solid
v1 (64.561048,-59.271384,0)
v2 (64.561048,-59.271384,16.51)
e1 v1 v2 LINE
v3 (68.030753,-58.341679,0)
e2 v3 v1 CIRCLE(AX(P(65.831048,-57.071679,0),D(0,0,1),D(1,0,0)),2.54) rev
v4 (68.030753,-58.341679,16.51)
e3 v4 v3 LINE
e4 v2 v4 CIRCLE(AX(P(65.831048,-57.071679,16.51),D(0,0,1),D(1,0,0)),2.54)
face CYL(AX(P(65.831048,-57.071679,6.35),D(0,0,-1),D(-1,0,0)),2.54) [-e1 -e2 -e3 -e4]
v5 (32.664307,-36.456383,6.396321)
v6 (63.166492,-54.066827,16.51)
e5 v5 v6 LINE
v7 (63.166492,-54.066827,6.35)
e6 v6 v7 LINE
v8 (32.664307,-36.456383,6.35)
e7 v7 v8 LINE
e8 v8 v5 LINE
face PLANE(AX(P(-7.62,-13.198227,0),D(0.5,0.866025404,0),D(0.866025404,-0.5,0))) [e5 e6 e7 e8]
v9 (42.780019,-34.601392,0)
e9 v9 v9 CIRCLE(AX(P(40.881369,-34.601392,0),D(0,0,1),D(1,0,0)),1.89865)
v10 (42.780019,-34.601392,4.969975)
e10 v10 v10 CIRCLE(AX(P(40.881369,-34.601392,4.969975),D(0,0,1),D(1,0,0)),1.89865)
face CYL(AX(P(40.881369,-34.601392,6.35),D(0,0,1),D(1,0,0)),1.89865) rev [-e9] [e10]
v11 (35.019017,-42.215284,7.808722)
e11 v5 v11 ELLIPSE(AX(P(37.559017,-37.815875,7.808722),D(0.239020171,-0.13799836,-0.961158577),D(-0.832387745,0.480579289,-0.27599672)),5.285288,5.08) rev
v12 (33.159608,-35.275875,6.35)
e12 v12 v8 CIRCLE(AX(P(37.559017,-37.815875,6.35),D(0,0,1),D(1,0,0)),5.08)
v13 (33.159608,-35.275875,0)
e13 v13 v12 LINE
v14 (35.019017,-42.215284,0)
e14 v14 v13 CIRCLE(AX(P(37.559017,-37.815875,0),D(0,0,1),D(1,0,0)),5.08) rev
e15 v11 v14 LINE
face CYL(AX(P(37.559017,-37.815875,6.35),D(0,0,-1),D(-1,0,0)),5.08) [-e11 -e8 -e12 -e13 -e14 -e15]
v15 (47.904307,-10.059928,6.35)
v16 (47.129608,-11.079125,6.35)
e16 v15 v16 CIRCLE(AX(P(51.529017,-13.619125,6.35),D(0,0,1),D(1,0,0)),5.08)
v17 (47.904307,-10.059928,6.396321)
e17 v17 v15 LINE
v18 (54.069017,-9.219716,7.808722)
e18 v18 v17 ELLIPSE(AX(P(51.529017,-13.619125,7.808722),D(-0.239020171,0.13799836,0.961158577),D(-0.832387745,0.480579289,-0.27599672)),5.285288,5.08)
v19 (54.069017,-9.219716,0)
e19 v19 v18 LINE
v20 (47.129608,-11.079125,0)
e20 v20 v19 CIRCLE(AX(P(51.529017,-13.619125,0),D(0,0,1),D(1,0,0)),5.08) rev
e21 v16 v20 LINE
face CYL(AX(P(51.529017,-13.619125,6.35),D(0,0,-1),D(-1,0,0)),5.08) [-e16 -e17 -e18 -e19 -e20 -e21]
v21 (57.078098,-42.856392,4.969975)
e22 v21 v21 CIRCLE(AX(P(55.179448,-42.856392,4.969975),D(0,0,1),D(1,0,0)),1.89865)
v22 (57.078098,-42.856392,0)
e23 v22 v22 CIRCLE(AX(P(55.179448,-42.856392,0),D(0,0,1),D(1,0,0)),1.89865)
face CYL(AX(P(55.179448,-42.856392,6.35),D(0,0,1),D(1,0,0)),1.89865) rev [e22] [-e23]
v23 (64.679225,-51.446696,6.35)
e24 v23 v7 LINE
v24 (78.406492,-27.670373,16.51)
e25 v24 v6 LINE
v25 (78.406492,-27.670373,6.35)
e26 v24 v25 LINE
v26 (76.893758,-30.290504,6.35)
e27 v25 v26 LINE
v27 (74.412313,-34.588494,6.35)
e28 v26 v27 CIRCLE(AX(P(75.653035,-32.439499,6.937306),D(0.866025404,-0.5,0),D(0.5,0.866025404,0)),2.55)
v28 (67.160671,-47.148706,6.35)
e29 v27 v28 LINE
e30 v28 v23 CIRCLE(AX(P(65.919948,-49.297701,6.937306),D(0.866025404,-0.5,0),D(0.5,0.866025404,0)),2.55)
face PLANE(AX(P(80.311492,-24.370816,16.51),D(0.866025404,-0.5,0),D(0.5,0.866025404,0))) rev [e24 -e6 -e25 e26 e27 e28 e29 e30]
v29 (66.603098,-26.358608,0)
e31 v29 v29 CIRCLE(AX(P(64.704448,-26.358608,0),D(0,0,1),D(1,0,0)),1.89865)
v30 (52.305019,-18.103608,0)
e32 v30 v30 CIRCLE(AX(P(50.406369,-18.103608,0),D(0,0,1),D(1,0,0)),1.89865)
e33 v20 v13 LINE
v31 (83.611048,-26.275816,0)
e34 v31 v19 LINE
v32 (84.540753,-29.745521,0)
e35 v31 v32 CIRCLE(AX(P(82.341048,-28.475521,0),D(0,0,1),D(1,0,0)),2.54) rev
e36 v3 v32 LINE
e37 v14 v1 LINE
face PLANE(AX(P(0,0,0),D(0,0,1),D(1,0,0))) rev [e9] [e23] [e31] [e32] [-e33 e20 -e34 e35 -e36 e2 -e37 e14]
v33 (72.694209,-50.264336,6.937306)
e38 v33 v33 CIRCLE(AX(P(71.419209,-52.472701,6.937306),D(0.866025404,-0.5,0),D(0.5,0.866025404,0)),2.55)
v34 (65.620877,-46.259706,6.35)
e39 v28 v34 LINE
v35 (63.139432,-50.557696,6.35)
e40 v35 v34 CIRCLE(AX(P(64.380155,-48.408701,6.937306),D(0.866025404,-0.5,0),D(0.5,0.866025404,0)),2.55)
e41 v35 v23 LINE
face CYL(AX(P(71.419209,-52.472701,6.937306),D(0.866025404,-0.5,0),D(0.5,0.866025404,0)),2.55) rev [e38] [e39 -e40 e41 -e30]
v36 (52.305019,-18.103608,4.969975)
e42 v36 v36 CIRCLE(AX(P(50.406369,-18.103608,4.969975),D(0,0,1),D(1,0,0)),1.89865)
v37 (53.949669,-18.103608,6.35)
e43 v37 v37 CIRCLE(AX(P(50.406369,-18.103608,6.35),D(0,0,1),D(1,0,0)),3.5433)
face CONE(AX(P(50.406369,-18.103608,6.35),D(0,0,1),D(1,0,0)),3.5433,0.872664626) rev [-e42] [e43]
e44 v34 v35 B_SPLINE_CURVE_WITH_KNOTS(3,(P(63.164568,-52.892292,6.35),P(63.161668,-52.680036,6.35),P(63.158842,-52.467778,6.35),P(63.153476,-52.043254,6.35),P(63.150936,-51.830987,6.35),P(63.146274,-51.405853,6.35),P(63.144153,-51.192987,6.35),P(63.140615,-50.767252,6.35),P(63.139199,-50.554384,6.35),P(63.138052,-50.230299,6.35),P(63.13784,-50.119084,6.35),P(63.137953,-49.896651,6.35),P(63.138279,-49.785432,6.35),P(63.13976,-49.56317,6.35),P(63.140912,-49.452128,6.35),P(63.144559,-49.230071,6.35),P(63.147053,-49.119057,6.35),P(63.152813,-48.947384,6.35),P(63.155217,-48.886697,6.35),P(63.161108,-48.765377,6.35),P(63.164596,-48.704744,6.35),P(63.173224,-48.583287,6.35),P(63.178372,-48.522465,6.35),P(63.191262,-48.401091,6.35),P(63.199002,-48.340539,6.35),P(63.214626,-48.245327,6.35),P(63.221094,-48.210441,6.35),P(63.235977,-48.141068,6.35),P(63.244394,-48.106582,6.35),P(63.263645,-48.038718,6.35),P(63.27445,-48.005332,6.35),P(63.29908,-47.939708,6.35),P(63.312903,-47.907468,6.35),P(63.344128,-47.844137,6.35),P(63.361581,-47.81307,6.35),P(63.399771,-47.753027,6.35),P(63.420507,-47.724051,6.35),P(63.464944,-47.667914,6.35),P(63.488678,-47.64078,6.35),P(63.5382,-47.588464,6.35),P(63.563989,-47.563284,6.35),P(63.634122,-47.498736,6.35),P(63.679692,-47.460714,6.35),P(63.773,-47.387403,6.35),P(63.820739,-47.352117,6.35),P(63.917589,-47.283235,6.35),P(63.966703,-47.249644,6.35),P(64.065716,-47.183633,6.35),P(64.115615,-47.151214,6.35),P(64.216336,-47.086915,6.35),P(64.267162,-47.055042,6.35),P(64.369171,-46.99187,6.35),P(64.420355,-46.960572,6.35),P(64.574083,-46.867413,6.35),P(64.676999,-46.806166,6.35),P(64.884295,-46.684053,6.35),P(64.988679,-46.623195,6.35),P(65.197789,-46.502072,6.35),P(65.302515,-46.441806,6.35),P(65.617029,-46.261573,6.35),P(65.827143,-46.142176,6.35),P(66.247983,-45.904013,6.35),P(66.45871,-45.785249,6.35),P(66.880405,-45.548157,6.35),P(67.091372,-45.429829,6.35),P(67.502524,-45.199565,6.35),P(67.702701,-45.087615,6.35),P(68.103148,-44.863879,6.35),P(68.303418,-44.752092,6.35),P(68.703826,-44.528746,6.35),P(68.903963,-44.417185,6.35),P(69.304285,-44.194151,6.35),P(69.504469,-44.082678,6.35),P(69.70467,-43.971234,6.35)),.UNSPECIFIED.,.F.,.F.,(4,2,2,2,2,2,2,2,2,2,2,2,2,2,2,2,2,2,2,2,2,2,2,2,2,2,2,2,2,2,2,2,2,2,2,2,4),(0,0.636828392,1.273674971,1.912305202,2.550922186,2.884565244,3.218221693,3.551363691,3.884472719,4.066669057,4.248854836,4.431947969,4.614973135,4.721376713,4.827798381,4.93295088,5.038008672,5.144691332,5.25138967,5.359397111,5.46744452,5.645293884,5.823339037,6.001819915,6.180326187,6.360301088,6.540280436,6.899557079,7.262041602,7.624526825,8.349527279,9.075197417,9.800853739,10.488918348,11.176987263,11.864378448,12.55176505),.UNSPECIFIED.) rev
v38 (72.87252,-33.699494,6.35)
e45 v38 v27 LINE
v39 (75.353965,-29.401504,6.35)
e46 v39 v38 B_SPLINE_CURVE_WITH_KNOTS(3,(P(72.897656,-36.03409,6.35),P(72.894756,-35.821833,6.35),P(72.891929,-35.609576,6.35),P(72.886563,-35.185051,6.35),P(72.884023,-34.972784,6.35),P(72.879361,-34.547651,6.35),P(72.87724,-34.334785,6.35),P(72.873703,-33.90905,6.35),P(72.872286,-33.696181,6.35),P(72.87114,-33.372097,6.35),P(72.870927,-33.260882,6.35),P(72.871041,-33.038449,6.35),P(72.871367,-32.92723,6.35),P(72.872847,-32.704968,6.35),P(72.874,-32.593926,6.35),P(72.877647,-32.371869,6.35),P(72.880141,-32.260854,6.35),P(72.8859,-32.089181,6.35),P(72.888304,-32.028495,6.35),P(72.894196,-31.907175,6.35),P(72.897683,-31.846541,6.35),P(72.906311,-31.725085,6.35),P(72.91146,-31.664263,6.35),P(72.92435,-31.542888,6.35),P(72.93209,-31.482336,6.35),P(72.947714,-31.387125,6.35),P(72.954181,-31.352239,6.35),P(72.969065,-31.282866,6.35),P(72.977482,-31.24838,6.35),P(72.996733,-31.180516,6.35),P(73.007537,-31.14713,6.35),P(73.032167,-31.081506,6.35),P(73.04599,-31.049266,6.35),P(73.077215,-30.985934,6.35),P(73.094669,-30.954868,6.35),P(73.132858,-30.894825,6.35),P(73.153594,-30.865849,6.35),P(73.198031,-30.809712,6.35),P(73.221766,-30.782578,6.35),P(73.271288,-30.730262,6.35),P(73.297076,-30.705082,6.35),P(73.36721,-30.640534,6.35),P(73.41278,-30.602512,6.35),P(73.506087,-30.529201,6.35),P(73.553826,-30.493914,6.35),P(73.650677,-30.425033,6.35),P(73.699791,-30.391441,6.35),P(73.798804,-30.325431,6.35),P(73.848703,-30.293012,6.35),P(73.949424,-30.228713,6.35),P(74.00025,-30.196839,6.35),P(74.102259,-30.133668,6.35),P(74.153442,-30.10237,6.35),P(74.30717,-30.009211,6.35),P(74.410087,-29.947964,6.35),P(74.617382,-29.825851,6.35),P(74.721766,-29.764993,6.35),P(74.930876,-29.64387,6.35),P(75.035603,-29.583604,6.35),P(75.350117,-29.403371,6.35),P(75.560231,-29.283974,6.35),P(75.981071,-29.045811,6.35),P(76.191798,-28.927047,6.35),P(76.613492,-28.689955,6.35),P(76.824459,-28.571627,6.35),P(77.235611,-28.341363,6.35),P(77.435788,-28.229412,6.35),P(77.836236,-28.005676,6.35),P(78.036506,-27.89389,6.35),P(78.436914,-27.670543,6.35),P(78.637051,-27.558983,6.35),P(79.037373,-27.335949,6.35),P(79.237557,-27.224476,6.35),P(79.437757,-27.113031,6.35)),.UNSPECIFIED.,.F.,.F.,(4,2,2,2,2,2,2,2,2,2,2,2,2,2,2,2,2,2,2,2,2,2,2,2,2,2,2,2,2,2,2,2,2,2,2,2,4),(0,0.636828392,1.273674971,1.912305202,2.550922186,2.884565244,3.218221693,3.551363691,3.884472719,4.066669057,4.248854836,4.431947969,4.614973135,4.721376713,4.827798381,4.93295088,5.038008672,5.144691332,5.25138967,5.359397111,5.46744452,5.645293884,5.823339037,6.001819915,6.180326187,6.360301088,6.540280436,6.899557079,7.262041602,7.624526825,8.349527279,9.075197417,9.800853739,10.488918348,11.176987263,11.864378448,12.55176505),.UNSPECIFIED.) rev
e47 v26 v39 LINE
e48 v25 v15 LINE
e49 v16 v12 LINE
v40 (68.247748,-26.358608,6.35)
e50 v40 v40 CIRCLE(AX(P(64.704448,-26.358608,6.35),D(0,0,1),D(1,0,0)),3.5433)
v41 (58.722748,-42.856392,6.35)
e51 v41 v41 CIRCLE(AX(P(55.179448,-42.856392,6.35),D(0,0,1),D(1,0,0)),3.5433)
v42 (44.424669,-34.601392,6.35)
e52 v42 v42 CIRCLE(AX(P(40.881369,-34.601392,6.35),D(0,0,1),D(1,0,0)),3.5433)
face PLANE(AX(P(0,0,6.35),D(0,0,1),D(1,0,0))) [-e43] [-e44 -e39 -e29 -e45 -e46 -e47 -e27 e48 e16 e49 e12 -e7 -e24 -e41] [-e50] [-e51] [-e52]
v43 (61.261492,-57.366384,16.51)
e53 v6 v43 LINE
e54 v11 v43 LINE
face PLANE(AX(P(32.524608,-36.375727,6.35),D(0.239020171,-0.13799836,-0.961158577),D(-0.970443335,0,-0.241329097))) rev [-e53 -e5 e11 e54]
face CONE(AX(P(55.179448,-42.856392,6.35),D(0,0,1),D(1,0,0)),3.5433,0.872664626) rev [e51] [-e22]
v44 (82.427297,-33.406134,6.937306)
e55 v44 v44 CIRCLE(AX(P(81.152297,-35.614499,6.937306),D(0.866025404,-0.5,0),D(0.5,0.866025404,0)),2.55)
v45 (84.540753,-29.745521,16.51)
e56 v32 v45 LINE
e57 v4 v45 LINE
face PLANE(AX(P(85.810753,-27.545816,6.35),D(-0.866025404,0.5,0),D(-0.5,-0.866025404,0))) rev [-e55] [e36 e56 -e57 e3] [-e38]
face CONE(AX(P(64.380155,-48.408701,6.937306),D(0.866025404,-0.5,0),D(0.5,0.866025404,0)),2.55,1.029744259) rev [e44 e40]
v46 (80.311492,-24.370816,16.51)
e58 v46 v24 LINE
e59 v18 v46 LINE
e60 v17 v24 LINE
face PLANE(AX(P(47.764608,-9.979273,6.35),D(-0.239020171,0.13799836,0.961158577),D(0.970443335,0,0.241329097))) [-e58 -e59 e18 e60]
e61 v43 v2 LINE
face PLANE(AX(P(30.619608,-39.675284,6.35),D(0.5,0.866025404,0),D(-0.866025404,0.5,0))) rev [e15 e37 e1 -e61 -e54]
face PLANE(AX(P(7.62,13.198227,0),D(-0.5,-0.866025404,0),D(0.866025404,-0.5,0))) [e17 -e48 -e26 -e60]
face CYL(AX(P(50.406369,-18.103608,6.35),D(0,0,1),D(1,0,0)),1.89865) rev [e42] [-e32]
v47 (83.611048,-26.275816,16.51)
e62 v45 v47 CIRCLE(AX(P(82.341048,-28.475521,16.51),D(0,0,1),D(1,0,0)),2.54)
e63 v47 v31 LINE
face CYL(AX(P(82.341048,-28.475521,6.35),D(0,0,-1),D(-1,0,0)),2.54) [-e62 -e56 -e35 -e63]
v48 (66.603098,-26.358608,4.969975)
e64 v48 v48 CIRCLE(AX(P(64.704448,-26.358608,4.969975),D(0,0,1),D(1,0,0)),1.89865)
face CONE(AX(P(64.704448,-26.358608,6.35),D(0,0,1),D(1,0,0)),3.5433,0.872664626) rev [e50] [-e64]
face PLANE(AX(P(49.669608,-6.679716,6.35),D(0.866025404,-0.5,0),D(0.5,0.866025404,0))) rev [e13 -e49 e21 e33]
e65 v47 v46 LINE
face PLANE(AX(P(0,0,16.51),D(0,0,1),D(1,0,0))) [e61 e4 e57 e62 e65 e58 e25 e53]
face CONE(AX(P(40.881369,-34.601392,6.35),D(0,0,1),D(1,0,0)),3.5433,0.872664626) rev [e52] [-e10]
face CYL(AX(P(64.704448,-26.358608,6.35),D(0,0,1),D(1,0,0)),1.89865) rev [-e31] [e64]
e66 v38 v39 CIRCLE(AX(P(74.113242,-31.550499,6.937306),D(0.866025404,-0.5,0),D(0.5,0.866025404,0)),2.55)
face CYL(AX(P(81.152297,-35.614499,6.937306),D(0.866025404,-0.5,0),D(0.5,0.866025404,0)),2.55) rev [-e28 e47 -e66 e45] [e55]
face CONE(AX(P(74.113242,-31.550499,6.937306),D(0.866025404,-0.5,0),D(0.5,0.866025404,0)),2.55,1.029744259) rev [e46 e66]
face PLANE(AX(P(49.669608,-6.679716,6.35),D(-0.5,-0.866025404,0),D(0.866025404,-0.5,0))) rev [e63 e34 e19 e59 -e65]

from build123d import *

# Parameters (mm, degrees)
BOSS_EXTRUDE1_DEPTH                               = 6.35
BOSS_EXTRUDE2_DEPTH                               = 10.16
BOSS_EXTRUDE3_DEPTH                               = 3.81
F_5_1_5_1_DIAMETER_HOLE1_D                        = 5.1
F_5_1_5_1_DIAMETER_HOLE1_DEPTH                    = 8.128
F_5_1_5_1_DIAMETER_HOLE1_TIP                      = 1.532194579
CSK_FOR_6_FLAT_HEAD_MACHINE_SCREW_100_D           = 3.7973
CSK_FOR_6_FLAT_HEAD_MACHINE_SCREW_100_CSINK_D     = 7.0866
CSK_FOR_6_FLAT_HEAD_MACHINE_SCREW_100_CSINK_ANGLE = 100
FILLET1_R                                         = 5.08
FILLET2_R                                         = 2.54


with BuildPart() as part:
    # Sketch2 → Boss-Extrude1 (new body)
    with BuildSketch(Plane.XY):
        Polygon((30.619607592, -39.675283942), (66.760752948, -60.541383942), (85.810752948, -27.545816058), (49.669607592, -6.679716058), align=None)
    extrude(amount=BOSS_EXTRUDE1_DEPTH)

    # Sketch3 → Boss-Extrude2 (add)
    with BuildSketch(Plane.XY.offset(6.35)):
        Polygon((80.311491634, -24.370816058), (61.261491634, -57.366383942), (66.760752948, -60.541383942), (85.810752948, -27.545816058), align=None)
    extrude(amount=BOSS_EXTRUDE2_DEPTH)

    # Sketch4 → Boss-Extrude3 (add)
    with BuildSketch(Plane(origin=(9.525, 16.497783942, 0), x_dir=(0.8660254037844388, -0.4999999999999997, 0), z_dir=(0.49999999999999983, 0.8660254037844389, 0))):
        Polygon((46.355, -6.35), (81.7372, -16.51), (81.7372, -6.35), align=None)
    boss_extrude3 = extrude(amount=-BOSS_EXTRUDE3_DEPTH)

    # Mirror1: Boss-Extrude3 across plane
    add(boss_extrude3.mirror(Plane(origin=(0, 0, 0), x_dir=(0, 0, 1), z_dir=(0.4999999999999997, 0.8660254037844389, 0))))

    # Ø5.1 (5.1) Diameter Hole1
    with Locations(Plane(origin=(76.285752948, -44.0436, 0), x_dir=(0, 0, -1), z_dir=(0.8660254037844385, -0.5000000000000004, 0))):
        with Locations((-6.937306149, 9.733087598), (-6.937306149, -9.733087598)):
            Hole(F_5_1_5_1_DIAMETER_HOLE1_D / 2, depth=F_5_1_5_1_DIAMETER_HOLE1_DEPTH)
            with Locations((0, 0, -(F_5_1_5_1_DIAMETER_HOLE1_DEPTH + F_5_1_5_1_DIAMETER_HOLE1_TIP / 2))):  # 118° drill point
                Cone(0, F_5_1_5_1_DIAMETER_HOLE1_D / 2, F_5_1_5_1_DIAMETER_HOLE1_TIP, mode=Mode.SUBTRACT)

    # CSK for #6 Flat Head Machine Screw (100)1 (through all)
    with Locations(Plane.XY.offset(6.35)):
        with Locations((40.881368906, -34.601391971), (50.406368906, -18.103608029), (64.704448323, -26.358608029), (55.179448323, -42.856391971)):
            CounterSinkHole(CSK_FOR_6_FLAT_HEAD_MACHINE_SCREW_100_D / 2, CSK_FOR_6_FLAT_HEAD_MACHINE_SCREW_100_CSINK_D / 2, counter_sink_angle=CSK_FOR_6_FLAT_HEAD_MACHINE_SCREW_100_CSINK_ANGLE)

    # Fillet1
    # the kernel refuses this fillet: 5.08 mm, written as the material it takes off along each edge
    with BuildSketch(Plane(origin=(49.669607592, -6.679716058, -12.7), x_dir=(0.8660254037844385, -0.5000000000000002, 0), z_dir=(0, 0, 1))) as fillet1_piece_1:
        with BuildLine():
            CenterArc((FILLET1_R, -FILLET1_R), FILLET1_R, 90, 90)
            Line((0, -FILLET1_R), (0, 0))
            Line((0, 0), (FILLET1_R, 0))
        make_face()
    extrude(amount=31.75, mode=Mode.SUBTRACT)
    with BuildSketch(Plane(origin=(30.619607592, -39.675283942, -12.7), x_dir=(0.8660254037844386, -0.5, 0), z_dir=(0, 0, 1))) as fillet1_piece_2:
        with BuildLine():
            CenterArc((FILLET1_R, FILLET1_R), FILLET1_R, 180, 90)
            Line((0, FILLET1_R), (0, 0))
            Line((0, 0), (FILLET1_R, 0))
        make_face()
    extrude(amount=31.75, mode=Mode.SUBTRACT)

    # Fillet2
    fillet2_edges = [part.edges().sort_by_distance(p)[0] for p in [
        (85.810752948, -27.545816058, 8.255),
        (66.760752948, -60.541383942, 8.255),
    ]]
    fillet(fillet2_edges, radius=FILLET2_R)


solid = part.part
